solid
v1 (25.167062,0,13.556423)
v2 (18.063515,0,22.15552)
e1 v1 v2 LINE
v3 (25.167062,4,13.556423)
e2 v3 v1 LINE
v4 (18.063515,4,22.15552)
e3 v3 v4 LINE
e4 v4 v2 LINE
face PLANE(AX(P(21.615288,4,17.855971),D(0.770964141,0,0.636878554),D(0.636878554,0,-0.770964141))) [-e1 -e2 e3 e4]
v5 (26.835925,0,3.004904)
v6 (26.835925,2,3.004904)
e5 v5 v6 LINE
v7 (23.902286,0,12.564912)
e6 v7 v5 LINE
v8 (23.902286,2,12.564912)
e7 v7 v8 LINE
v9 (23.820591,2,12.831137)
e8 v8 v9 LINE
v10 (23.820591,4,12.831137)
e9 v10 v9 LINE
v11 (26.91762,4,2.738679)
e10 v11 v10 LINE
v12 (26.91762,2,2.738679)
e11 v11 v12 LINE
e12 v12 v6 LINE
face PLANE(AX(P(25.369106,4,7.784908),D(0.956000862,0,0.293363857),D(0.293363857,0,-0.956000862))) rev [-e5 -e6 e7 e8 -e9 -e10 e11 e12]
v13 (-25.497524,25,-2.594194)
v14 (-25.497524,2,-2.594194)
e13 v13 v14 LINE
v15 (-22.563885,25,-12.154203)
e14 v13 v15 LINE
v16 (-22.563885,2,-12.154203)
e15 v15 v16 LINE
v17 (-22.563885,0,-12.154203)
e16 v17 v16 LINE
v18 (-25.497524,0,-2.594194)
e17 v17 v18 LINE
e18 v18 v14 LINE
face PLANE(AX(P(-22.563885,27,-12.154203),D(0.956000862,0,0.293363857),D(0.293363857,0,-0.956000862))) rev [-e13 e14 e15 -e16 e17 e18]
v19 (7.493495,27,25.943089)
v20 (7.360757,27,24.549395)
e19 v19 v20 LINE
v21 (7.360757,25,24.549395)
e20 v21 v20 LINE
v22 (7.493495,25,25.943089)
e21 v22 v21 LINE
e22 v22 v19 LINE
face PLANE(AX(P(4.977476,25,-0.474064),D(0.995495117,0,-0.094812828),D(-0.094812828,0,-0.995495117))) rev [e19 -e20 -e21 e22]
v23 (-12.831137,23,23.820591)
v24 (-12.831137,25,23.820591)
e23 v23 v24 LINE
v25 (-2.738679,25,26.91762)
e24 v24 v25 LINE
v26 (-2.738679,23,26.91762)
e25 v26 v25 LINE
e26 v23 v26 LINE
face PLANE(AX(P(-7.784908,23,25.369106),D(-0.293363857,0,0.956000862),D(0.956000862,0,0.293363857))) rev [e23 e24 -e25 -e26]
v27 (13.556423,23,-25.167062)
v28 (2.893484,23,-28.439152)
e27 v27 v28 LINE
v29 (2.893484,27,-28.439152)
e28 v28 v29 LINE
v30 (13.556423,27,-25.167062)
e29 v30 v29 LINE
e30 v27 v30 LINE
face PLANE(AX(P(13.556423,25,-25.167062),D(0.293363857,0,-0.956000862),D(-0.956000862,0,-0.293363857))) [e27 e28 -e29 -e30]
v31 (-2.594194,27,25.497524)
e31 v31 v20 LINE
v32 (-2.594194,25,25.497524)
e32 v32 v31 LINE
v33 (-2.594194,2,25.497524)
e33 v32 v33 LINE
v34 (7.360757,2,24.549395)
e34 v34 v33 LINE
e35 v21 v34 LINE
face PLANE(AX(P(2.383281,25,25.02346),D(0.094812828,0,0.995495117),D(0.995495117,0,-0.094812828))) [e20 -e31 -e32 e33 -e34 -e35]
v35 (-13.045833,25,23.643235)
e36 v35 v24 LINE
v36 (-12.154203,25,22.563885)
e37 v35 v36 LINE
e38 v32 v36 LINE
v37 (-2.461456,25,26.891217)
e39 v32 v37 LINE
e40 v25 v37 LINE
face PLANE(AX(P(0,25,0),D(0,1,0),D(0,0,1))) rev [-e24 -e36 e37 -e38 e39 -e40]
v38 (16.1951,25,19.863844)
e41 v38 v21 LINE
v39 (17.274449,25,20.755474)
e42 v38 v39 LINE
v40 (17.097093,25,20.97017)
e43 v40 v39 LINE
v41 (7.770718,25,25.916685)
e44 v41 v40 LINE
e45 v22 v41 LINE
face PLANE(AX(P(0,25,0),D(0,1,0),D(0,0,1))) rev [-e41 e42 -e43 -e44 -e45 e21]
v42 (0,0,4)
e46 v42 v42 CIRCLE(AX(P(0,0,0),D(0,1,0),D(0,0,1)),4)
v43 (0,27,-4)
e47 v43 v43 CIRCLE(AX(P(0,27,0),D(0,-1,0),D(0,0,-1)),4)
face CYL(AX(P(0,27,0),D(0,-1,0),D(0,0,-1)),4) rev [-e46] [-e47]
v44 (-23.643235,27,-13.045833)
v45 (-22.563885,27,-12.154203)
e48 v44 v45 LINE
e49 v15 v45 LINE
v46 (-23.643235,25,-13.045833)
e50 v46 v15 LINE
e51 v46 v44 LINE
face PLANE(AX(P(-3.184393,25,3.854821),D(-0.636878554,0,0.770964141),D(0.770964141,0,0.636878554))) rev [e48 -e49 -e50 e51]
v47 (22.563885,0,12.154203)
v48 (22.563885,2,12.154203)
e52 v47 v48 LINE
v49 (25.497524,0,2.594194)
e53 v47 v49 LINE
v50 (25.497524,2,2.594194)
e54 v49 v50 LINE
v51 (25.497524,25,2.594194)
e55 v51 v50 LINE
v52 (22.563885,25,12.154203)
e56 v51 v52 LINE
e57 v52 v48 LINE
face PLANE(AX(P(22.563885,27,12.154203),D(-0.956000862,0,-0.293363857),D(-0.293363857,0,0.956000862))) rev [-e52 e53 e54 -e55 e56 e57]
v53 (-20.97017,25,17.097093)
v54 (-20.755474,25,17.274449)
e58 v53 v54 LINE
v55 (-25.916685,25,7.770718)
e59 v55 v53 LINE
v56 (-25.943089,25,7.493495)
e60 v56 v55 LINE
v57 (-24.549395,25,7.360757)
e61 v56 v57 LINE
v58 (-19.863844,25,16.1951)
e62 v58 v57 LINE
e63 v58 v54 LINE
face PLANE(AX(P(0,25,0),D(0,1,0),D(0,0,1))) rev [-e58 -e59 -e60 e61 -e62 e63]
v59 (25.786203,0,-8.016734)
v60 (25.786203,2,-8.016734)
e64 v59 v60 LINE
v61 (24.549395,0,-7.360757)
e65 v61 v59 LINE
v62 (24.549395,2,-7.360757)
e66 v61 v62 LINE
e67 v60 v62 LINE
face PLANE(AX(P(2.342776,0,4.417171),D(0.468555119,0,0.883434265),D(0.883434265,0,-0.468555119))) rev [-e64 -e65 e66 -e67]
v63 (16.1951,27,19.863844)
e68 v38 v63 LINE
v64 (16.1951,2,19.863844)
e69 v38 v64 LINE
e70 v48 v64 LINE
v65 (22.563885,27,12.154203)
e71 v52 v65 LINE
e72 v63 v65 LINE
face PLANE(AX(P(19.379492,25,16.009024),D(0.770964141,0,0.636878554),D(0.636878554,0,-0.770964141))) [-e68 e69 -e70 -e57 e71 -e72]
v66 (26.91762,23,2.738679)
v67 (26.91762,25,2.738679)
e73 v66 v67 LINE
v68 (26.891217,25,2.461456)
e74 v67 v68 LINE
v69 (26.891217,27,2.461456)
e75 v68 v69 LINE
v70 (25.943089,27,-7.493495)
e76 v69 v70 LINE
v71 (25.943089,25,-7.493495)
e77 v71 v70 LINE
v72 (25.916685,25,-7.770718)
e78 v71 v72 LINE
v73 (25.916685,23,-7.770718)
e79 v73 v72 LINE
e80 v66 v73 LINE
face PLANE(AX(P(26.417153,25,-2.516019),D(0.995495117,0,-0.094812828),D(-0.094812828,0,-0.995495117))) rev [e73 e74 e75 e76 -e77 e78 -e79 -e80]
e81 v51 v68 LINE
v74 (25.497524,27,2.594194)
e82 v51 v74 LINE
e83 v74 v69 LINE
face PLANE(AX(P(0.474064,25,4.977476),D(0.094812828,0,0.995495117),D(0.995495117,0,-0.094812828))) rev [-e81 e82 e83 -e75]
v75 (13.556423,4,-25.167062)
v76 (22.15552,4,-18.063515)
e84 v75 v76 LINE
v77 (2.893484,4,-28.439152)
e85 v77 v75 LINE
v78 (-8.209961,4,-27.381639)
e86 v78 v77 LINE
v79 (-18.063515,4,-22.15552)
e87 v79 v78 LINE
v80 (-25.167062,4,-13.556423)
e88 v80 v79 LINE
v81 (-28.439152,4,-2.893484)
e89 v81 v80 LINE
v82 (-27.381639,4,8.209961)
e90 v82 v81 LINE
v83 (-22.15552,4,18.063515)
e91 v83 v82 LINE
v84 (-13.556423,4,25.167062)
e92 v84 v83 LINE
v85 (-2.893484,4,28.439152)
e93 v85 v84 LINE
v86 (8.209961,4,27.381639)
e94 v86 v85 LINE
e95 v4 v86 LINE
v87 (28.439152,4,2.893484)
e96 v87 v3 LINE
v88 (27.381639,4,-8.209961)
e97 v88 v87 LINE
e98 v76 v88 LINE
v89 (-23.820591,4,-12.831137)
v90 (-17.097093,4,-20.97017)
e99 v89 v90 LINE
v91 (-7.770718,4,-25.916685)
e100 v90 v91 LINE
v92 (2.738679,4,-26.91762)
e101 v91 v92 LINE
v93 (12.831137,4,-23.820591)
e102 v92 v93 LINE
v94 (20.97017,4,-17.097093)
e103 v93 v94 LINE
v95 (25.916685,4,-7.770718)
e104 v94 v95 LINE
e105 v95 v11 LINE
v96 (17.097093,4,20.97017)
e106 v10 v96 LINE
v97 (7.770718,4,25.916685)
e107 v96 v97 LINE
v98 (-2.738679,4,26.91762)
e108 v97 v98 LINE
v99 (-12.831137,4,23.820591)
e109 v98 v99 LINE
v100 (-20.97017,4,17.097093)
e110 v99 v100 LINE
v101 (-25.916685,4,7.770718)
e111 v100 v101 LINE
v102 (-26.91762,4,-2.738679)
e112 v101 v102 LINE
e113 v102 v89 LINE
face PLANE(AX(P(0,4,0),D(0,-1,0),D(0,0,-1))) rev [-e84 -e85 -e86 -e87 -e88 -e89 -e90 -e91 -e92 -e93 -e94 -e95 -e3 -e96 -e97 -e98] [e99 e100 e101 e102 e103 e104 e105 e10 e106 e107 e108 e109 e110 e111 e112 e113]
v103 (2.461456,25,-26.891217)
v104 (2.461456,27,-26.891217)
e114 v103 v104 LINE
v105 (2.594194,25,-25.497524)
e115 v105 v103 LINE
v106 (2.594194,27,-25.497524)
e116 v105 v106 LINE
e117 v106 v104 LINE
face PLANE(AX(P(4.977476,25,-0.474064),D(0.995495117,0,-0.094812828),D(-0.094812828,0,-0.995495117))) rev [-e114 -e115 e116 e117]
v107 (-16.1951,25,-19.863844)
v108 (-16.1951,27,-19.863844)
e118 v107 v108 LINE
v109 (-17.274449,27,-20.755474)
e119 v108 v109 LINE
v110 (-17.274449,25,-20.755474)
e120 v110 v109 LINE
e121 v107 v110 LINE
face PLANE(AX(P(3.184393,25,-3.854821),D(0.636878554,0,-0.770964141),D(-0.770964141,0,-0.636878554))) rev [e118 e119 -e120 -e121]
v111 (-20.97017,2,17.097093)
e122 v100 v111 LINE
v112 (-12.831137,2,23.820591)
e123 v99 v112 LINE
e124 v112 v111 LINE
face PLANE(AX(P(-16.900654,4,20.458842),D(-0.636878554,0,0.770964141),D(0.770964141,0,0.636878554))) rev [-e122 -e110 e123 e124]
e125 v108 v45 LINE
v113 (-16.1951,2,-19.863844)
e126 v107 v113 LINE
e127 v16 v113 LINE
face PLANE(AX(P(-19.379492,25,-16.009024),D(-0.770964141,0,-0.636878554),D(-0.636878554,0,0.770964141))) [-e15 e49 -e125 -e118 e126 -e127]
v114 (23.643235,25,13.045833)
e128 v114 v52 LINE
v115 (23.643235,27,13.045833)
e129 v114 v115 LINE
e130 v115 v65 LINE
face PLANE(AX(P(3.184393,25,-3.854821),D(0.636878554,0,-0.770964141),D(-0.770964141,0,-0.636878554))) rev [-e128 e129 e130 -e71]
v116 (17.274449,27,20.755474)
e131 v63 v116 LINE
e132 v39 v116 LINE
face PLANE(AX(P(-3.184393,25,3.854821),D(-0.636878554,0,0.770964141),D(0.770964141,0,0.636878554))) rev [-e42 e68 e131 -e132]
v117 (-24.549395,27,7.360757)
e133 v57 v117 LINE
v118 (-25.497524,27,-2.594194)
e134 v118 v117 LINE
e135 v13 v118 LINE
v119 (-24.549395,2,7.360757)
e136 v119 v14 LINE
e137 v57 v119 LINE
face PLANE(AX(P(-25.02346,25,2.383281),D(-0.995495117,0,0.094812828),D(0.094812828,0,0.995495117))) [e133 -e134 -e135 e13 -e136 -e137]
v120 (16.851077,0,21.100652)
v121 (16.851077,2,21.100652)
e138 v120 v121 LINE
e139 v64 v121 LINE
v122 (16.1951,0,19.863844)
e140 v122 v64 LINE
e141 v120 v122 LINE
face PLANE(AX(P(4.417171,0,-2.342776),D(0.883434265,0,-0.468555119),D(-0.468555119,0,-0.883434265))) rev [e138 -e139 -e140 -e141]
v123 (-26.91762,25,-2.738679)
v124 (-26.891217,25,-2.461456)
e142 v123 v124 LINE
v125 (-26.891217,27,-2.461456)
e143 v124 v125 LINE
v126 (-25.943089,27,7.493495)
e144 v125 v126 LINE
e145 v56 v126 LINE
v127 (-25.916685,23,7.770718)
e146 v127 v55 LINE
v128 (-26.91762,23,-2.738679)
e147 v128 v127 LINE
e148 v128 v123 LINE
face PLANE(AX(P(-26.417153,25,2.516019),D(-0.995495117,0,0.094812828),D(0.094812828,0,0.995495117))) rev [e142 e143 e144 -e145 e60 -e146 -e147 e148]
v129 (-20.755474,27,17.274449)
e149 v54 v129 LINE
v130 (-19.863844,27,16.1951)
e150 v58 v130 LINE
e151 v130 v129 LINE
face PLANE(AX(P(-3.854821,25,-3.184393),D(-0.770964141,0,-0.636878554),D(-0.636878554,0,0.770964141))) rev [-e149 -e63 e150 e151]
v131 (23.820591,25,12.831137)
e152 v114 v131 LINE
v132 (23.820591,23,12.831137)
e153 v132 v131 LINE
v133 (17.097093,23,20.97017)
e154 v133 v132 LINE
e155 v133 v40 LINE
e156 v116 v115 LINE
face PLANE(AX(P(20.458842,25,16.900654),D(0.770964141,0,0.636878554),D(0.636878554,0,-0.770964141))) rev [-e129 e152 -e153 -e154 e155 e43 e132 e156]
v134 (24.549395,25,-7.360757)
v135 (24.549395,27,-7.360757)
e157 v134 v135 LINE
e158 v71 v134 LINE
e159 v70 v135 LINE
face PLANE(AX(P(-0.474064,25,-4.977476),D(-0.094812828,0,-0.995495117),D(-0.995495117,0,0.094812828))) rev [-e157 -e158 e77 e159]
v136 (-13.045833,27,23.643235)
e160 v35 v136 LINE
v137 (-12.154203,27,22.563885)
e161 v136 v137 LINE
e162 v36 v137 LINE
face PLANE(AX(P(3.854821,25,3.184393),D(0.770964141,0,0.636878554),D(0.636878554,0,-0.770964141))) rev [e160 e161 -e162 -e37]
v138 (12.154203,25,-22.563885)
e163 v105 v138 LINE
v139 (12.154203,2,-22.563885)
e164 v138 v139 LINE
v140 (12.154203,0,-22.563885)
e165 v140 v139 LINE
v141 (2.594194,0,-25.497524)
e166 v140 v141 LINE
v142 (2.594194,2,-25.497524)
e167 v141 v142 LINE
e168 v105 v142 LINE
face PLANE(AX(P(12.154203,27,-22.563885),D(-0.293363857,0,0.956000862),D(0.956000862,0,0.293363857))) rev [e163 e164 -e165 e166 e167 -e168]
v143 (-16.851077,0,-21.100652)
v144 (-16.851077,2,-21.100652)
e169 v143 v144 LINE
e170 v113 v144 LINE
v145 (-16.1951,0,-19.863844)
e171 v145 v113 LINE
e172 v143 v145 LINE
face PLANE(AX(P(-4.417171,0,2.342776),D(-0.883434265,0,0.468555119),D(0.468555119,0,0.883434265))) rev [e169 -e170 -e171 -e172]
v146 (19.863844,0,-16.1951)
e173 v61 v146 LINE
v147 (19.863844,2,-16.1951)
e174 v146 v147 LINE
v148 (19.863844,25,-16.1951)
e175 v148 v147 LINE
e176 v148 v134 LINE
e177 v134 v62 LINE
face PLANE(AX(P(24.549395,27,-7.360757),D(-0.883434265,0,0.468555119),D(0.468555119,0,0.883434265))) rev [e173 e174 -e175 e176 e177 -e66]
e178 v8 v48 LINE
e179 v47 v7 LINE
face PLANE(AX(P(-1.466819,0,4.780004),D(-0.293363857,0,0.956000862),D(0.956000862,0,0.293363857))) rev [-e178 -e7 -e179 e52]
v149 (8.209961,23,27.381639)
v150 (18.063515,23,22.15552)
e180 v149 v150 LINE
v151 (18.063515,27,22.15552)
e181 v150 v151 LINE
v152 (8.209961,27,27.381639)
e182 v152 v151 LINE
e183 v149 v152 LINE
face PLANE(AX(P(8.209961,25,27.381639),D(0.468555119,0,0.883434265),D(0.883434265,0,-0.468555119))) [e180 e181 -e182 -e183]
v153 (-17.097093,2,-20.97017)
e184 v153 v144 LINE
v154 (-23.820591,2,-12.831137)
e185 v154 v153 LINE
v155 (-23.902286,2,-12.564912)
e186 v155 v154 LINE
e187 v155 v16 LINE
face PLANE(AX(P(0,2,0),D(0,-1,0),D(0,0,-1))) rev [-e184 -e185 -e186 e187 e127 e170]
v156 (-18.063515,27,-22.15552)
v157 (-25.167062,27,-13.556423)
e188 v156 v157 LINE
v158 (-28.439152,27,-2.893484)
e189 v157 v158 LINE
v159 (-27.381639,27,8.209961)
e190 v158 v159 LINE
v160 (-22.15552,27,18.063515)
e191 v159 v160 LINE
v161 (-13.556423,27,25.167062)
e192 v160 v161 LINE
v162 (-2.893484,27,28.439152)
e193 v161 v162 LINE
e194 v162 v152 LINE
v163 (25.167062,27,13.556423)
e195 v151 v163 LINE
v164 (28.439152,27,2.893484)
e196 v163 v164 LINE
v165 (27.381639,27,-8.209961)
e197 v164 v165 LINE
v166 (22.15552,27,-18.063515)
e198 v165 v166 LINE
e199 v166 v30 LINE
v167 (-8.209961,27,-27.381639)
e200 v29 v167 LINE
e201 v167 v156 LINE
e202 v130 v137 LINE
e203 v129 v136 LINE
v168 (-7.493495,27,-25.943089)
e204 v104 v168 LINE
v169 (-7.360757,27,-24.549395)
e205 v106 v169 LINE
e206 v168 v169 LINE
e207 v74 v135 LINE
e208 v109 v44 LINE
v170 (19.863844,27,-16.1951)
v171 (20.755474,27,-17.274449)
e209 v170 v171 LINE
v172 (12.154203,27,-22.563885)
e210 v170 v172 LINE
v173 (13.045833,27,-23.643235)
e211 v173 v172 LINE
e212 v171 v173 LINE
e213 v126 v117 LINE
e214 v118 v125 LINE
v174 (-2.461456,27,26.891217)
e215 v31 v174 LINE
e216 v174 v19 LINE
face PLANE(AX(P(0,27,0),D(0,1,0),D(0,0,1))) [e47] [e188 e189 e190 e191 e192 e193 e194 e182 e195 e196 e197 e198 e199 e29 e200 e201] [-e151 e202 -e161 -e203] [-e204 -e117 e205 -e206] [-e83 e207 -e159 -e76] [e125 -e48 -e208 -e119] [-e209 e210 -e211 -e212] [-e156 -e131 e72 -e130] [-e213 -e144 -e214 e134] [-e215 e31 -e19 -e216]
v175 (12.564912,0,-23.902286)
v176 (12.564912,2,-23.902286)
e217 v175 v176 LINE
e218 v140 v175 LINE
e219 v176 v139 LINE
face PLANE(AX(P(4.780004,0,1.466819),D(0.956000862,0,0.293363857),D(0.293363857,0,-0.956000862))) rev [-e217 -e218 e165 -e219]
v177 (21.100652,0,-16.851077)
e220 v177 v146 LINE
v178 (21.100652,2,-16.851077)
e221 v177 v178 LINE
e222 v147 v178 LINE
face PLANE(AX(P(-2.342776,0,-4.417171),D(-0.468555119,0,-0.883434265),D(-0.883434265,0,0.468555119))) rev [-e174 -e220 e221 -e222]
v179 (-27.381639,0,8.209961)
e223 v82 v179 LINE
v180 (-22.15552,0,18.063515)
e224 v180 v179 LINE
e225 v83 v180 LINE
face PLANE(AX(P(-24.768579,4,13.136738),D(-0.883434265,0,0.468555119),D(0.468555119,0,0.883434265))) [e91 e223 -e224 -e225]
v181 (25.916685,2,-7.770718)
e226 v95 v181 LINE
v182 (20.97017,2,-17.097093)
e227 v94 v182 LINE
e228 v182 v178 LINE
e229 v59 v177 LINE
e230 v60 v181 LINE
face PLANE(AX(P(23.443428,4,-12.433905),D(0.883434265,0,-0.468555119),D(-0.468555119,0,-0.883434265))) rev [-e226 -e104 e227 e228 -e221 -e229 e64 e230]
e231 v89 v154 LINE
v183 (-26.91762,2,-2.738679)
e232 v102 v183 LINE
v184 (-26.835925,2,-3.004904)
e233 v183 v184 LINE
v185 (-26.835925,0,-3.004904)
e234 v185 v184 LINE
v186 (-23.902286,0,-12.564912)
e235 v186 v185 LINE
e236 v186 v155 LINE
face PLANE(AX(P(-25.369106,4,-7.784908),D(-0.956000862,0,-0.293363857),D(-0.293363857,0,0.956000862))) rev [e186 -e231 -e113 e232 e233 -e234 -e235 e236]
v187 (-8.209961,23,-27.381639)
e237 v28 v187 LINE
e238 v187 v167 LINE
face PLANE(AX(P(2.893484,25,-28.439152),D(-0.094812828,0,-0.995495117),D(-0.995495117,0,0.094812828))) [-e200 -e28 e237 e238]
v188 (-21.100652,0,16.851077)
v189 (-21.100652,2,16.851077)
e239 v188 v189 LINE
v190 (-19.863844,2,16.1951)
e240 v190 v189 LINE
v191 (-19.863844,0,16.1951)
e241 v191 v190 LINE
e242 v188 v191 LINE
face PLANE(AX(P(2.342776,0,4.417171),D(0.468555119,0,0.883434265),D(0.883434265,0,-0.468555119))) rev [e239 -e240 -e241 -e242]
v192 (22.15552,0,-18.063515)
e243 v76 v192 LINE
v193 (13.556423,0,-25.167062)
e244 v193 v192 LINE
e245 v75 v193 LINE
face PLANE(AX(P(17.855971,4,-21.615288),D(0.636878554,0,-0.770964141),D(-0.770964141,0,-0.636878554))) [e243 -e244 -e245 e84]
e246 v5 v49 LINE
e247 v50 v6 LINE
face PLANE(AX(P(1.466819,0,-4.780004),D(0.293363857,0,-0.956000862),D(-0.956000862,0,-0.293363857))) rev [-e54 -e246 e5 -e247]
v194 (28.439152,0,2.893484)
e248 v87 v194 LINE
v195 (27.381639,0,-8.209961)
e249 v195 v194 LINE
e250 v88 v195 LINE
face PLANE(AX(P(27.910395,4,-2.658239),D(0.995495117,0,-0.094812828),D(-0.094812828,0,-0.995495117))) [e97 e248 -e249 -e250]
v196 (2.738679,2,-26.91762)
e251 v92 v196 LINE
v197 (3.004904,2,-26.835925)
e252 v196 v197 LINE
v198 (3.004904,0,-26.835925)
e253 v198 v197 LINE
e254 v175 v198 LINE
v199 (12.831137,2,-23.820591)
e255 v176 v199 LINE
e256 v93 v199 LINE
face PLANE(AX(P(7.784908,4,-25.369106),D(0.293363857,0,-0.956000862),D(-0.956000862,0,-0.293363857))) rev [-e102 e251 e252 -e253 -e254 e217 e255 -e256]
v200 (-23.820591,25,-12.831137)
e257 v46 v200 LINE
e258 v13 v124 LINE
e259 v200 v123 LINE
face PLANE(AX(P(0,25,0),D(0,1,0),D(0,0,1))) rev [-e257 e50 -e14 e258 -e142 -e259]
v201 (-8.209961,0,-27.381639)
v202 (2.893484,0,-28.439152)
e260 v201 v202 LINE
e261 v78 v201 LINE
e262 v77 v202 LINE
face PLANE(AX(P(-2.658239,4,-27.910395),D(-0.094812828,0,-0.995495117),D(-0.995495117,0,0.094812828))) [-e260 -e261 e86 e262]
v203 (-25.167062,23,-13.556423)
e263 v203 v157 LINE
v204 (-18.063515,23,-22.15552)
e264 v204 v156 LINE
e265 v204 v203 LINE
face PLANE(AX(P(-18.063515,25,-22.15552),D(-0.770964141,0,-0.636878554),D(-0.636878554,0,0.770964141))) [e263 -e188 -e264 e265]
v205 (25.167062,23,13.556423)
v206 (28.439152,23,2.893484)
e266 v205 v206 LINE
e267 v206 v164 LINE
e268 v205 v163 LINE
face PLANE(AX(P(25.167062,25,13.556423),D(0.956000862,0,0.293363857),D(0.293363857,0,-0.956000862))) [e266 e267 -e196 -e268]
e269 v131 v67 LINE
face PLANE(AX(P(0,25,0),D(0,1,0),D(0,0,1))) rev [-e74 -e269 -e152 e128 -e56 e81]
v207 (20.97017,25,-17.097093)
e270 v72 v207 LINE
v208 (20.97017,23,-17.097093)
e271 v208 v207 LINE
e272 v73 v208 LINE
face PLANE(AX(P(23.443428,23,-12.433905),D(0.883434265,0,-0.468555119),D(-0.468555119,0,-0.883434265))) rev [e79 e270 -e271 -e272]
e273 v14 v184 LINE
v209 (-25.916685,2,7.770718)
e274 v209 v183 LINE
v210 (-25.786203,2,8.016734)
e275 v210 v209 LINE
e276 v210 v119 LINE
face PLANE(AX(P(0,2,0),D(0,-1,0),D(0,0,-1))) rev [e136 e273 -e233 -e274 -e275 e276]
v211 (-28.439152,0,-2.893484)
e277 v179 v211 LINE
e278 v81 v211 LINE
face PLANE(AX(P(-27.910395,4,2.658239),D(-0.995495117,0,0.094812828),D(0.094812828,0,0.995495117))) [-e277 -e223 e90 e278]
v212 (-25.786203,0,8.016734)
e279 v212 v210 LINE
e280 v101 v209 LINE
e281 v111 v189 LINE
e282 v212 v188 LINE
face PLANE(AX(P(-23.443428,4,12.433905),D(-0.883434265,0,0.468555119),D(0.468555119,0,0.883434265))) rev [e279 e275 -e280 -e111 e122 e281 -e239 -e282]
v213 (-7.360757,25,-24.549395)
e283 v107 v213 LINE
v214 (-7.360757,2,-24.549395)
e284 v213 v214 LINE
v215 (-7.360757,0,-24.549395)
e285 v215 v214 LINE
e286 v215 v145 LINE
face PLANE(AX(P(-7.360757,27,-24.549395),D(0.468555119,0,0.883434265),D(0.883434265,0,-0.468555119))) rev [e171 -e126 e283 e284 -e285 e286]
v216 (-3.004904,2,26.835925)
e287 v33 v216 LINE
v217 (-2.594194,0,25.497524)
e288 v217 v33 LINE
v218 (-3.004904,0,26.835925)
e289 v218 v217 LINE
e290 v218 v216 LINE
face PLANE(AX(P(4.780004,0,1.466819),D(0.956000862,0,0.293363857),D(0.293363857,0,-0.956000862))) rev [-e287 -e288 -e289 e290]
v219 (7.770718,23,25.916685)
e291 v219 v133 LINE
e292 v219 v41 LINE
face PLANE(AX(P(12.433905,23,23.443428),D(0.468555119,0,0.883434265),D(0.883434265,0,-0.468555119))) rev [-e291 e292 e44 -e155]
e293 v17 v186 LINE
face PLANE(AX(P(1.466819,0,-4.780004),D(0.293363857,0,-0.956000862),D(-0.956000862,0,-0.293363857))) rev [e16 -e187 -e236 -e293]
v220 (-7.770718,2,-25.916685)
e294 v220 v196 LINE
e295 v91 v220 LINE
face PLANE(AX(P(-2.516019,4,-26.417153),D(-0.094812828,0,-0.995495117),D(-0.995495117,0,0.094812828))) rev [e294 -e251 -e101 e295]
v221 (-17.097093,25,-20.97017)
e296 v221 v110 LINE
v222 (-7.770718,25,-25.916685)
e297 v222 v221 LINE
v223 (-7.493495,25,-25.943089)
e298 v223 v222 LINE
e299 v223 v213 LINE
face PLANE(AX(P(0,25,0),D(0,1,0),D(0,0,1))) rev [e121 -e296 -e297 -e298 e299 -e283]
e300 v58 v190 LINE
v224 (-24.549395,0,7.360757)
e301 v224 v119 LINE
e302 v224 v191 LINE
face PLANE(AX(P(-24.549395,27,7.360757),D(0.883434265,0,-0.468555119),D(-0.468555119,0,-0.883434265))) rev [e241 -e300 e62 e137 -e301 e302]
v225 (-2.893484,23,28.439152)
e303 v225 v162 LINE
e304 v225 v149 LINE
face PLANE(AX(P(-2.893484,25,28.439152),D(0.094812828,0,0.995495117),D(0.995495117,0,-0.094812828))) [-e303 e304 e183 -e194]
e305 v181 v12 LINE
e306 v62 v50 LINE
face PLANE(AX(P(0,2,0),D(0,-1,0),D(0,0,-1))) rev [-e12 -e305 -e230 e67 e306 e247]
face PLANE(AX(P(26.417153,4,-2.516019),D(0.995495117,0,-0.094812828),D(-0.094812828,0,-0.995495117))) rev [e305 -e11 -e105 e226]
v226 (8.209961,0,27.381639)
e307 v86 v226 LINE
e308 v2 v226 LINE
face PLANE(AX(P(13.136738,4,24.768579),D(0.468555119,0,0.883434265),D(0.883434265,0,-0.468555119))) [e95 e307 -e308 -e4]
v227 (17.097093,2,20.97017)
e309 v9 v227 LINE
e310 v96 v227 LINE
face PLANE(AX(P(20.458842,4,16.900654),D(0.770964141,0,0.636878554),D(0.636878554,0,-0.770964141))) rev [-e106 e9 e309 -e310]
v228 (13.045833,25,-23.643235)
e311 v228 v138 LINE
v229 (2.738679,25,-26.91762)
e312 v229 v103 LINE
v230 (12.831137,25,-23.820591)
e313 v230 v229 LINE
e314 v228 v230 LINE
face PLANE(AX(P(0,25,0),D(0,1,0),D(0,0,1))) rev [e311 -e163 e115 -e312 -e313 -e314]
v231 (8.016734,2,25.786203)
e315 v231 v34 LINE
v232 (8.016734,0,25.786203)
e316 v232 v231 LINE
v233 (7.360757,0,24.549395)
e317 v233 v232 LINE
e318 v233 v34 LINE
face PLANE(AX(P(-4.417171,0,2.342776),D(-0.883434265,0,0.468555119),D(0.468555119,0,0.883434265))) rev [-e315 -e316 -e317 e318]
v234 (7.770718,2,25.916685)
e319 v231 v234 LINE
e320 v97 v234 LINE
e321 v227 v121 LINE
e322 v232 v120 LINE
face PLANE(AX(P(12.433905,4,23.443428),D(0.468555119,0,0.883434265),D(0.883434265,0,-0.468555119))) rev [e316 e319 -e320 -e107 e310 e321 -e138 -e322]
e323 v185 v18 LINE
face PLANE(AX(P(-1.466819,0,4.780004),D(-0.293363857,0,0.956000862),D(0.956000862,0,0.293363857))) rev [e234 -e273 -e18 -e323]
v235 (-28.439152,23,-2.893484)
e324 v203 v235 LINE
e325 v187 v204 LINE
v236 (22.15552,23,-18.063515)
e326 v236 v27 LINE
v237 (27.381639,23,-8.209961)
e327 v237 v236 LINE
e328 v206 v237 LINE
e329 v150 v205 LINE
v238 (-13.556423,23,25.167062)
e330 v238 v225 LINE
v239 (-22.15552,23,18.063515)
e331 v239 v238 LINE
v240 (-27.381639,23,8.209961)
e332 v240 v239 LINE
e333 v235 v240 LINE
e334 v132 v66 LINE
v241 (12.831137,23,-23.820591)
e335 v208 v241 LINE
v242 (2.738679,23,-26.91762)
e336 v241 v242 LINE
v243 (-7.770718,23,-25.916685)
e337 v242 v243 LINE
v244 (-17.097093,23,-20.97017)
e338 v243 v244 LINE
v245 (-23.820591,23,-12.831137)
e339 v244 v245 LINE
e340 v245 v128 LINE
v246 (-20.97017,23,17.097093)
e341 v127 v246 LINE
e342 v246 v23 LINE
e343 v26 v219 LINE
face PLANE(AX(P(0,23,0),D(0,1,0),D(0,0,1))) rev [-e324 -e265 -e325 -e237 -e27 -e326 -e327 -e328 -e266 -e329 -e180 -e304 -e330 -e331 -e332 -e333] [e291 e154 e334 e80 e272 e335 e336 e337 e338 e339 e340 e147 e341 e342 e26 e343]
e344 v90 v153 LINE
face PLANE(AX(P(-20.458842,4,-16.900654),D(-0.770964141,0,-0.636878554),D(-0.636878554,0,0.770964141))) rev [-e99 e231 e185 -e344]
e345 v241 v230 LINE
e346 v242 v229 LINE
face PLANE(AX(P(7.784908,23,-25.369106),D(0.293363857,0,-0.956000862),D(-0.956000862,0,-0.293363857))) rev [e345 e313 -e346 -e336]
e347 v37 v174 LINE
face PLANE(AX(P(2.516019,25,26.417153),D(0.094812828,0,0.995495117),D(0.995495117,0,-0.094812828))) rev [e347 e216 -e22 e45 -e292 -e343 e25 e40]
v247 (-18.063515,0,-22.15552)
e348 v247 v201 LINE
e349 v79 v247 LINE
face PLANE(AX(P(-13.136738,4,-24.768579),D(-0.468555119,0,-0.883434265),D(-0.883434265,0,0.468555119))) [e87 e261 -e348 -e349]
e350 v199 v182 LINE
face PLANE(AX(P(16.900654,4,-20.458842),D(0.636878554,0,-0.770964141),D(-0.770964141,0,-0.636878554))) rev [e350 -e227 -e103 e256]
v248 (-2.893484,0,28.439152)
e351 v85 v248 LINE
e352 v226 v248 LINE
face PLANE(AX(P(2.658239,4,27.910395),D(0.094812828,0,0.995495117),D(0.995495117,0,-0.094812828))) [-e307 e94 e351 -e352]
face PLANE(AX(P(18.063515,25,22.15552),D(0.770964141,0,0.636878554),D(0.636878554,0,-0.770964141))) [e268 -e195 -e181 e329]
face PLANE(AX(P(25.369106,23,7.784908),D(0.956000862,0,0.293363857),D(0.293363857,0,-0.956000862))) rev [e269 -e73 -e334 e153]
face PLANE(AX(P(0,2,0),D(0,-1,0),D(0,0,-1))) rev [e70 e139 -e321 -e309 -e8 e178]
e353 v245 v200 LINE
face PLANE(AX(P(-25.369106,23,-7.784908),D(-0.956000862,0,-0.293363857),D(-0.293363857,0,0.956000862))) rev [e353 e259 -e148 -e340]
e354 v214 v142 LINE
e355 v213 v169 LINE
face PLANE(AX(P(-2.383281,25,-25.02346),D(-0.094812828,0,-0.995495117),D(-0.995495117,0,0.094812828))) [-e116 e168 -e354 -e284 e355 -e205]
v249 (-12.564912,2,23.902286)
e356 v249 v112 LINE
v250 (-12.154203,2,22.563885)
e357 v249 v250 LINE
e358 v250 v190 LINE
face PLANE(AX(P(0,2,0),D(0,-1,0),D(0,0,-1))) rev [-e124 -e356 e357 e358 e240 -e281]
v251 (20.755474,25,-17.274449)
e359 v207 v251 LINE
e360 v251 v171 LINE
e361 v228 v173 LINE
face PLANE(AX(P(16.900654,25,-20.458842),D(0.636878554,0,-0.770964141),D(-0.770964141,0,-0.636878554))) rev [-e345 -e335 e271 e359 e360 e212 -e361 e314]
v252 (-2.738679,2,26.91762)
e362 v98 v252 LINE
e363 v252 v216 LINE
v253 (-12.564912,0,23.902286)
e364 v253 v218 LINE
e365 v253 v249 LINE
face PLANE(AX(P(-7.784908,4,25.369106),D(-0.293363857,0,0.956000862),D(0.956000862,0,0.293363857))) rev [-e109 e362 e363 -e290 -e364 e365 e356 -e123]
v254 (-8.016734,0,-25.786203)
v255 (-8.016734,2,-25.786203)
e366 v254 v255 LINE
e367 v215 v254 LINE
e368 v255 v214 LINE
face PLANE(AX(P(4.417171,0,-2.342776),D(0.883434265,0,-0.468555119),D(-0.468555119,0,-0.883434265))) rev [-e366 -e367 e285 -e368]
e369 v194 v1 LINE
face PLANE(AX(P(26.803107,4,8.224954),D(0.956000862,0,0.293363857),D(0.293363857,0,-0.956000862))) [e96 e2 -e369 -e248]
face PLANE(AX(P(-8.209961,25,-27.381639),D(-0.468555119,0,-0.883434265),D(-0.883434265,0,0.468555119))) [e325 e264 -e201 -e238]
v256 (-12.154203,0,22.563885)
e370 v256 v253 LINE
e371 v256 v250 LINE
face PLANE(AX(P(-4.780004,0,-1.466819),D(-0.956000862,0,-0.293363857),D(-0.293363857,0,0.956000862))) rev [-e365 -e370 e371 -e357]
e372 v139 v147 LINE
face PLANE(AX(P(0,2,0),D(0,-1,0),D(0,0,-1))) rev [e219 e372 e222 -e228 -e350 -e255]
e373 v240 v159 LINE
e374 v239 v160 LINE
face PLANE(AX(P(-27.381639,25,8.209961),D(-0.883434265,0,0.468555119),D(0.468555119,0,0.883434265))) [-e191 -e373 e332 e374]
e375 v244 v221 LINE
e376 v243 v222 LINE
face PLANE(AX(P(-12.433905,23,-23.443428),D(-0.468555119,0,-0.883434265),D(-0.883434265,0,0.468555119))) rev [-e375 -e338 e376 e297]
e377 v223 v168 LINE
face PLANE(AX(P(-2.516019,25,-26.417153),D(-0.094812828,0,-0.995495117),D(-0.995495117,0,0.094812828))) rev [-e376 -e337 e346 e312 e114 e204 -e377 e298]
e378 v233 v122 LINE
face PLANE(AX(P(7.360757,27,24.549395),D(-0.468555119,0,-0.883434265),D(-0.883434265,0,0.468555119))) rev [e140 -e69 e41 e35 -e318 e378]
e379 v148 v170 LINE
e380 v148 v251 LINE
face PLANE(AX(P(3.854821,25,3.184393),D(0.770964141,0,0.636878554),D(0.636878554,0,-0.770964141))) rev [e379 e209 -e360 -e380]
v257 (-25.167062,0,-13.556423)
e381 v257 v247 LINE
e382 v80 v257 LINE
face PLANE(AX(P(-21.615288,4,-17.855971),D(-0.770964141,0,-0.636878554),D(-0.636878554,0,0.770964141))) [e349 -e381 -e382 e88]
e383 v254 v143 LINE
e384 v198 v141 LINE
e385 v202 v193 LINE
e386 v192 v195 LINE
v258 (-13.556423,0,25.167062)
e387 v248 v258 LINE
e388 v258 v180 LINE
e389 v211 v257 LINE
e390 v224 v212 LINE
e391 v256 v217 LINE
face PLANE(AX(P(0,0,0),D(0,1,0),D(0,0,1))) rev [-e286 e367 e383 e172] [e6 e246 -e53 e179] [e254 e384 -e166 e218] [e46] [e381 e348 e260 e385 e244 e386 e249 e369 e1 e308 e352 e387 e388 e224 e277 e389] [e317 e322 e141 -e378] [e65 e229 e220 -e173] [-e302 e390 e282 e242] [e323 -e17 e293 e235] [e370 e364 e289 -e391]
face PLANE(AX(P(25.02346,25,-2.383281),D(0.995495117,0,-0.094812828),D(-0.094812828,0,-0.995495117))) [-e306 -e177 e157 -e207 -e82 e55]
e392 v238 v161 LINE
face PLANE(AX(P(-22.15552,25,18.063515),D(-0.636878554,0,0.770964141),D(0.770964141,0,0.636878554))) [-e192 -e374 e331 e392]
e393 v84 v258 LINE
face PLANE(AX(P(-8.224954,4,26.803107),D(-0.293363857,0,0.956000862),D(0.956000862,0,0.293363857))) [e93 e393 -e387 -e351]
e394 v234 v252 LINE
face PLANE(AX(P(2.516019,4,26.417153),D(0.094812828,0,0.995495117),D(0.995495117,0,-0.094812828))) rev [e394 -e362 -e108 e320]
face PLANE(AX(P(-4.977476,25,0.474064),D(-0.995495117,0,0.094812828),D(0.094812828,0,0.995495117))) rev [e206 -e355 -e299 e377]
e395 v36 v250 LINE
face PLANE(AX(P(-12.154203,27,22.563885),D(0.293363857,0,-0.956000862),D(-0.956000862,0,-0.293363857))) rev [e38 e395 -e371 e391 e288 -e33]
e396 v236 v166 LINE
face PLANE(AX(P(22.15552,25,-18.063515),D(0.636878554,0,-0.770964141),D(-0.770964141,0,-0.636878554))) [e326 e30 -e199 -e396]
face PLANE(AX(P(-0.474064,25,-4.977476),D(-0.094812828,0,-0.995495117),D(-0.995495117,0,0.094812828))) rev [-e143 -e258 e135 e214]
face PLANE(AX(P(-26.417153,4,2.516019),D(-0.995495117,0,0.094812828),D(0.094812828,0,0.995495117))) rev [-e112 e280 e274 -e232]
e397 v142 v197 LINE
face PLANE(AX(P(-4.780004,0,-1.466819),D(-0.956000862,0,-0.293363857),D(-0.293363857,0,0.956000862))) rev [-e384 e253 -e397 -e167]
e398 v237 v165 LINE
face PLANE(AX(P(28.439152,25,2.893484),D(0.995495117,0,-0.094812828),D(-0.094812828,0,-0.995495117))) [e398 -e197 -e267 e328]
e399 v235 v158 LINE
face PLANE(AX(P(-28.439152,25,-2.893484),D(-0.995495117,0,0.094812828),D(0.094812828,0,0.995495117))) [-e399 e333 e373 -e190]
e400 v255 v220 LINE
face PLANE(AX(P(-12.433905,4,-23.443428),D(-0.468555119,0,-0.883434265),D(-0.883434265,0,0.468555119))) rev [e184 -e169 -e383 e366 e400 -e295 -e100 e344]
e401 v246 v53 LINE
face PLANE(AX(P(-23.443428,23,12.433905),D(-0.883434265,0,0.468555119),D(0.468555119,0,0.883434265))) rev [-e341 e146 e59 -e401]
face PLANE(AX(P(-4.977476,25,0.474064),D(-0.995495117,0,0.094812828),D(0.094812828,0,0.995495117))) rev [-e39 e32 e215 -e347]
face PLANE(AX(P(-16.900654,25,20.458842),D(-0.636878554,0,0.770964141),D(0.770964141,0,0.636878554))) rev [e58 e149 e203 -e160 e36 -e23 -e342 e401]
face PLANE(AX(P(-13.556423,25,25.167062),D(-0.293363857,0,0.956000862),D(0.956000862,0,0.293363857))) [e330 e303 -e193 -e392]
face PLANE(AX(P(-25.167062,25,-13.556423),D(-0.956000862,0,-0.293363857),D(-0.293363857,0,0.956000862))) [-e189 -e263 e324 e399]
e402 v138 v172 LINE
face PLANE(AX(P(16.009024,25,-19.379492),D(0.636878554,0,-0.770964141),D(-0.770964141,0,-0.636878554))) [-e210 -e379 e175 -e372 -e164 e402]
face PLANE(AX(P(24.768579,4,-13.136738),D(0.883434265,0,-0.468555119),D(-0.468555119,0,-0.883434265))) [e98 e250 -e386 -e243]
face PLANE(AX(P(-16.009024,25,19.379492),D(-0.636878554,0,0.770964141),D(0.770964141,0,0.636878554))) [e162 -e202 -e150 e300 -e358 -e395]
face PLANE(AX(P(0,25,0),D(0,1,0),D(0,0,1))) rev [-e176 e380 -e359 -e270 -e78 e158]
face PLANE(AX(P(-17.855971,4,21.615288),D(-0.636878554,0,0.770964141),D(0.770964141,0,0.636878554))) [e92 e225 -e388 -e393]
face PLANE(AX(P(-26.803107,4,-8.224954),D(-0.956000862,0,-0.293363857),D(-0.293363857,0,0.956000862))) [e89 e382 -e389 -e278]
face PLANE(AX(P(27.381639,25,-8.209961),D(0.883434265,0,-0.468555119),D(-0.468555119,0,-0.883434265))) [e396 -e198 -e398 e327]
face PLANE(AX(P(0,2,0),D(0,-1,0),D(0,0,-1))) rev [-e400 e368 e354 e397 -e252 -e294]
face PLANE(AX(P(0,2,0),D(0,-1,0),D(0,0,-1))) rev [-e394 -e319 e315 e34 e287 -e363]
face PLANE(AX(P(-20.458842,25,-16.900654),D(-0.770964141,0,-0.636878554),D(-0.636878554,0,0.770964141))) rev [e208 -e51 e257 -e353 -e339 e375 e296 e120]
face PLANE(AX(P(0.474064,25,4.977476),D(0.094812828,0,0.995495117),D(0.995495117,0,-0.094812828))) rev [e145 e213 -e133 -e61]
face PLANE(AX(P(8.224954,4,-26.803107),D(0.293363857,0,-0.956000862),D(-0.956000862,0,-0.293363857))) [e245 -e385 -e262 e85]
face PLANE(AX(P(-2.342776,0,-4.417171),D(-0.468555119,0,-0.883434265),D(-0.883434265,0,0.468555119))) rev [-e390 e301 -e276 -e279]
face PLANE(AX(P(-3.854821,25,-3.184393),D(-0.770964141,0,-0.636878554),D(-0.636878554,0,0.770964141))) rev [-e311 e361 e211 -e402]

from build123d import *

# Parameters (mm, degrees)
BOSS_EXTRUDE1_DEPTH     = 27
BOSS_EXTRUDE2_DEPTH     = 2
BOSS_EXTRUDE3_DEPTH     = 4
BOSS_EXTRUDE4_DEPTH     = 2
CUT_EXTRUDE1_DEPTH      = 49.441415403
CUT_EXTRUDE1_DEPTH_BACK = 49.441415403
BOSS_EXTRUDE8_DEPTH     = 2
BOSS_EXTRUDE9_DEPTH     = 4
CUT_EXTRUDE2_DEPTH      = 49.441415403
CUT_EXTRUDE2_DEPTH_BACK = 49.441415403
SKETCH5_R               = 4


with BuildPart() as part:
    # Sketch2 → Boss-Extrude1 (new body)
    with BuildSketch(Plane(origin=(0, 0, 0), x_dir=(1, 0, 0), z_dir=(0, 1, 0))):
        Polygon((22.563885141, -12.154202836), (25.497523714, -2.594194221), (24.549395438, 7.360756948), (19.863844247, 16.195099597), (12.154202836, 22.563885141), (2.594194221, 25.497523714), (-7.360756948, 24.549395438), (-16.195099597, 19.863844247), (-22.563885141, 12.154202836), (-25.497523714, 2.594194221), (-24.549395438, -7.360756948), (-19.863844247, -16.195099597), (-12.154202836, -22.563885141), (-2.594194221, -25.497523714), (7.360756948, -24.549395438), (16.195099597, -19.863844247), align=None)
    extrude(amount=BOSS_EXTRUDE1_DEPTH)



with BuildPart() as body_2:
    # Sketch3 → Boss-Extrude2 (new body)
    with BuildSketch(Plane(origin=(0, 27, 0), x_dir=(1, 0, 0), z_dir=(0, 1, 0))):
        Polygon((2.893484263, 28.439151941), (-8.20996139, 27.38163889), (-18.063514845, 22.155519532), (-25.167061911, 13.556423167), (-28.439151941, 2.893484263), (-27.38163889, -8.20996139), (-22.155519532, -18.063514845), (-13.556423167, -25.167061911), (-2.893484263, -28.439151941), (8.20996139, -27.38163889), (18.063514845, -22.155519532), (25.167061911, -13.556423167), (28.439151941, -2.893484263), (27.38163889, 8.20996139), (22.155519532, 18.063514845), (13.556423167, 25.167061911), align=None)
        Polygon((-7.360756948, 24.549395438), (-7.493494906, 25.943088602), (2.461456262, 26.891216878), (2.594194221, 25.497523714), align=None, mode=Mode.SUBTRACT)
        Polygon((-23.643234938, 13.045832812), (-17.274449394, 20.755474224), (-16.195099597, 19.863844247), (-22.563885141, 12.154202836), align=None, mode=Mode.SUBTRACT)
        Polygon((-25.943088602, -7.493494906), (-26.891216878, 2.461456262), (-25.497523714, 2.594194221), (-24.549395438, -7.360756948), align=None, mode=Mode.SUBTRACT)
        Polygon((-13.045832812, -23.643234938), (-20.755474224, -17.274449394), (-19.863844247, -16.195099597), (-12.154202836, -22.563885141), align=None, mode=Mode.SUBTRACT)
        Polygon((7.493494906, -25.943088602), (-2.461456262, -26.891216878), (-2.594194221, -25.497523714), (7.360756948, -24.549395438), align=None, mode=Mode.SUBTRACT)
        Polygon((23.643234938, -13.045832812), (17.274449394, -20.755474224), (16.195099597, -19.863844247), (22.563885141, -12.154202836), align=None, mode=Mode.SUBTRACT)
        Polygon((25.943088602, 7.493494906), (26.891216878, -2.461456262), (25.497523714, -2.594194221), (24.549395438, 7.360756948), align=None, mode=Mode.SUBTRACT)
        Polygon((13.045832812, 23.643234938), (20.755474224, 17.274449394), (19.863844247, 16.195099597), (12.154202836, 22.563885141), align=None, mode=Mode.SUBTRACT)
    extrude(amount=-BOSS_EXTRUDE2_DEPTH)


with BuildPart() as body_3:
    # Sketch4 → Boss-Extrude3 (new body)
    with BuildSketch(Plane(origin=(0, 0, 0), x_dir=(-1, 0, 0), z_dir=(0, -1, 0))):
        Polygon((8.20996139, 27.38163889), (-2.893484263, 28.439151941), (-13.556423167, 25.167061911), (-22.155519532, 18.063514845), (-27.38163889, 8.20996139), (-28.439151941, -2.893484263), (-25.167061911, -13.556423167), (-18.063514845, -22.155519532), (-8.20996139, -27.38163889), (2.893484263, -28.439151941), (13.556423167, -25.167061911), (22.155519532, -18.063514845), (27.38163889, -8.20996139), (28.439151941, 2.893484263), (25.167061911, 13.556423167), (18.063514845, 22.155519532), align=None)
        Polygon((-20.970170247, 17.097093165), (-12.831136789, 23.820591168), (-2.738679069, 26.9176201), (7.770717713, 25.91668538), (17.097093165, 20.970170247), (23.820591168, 12.831136789), (26.9176201, 2.738679069), (25.91668538, -7.770717713), (20.970170247, -17.097093165), (12.831136789, -23.820591168), (2.738679069, -26.9176201), (-7.770717713, -25.91668538), (-17.097093165, -20.970170247), (-23.820591168, -12.831136789), (-26.9176201, -2.738679069), (-25.91668538, 7.770717713), align=None, mode=Mode.SUBTRACT)
    extrude(amount=-BOSS_EXTRUDE3_DEPTH)


with BuildPart() as part_1:
    add(part.part)

    add(body_3.part)  # Boss-Extrude4 merges body 3
    # Sketch4<4> → Boss-Extrude4 (add)
    with BuildSketch(Plane(origin=(0, 0, 0), x_dir=(-1, 0, 0), z_dir=(0, -1, 0))):
        Polygon((-2.738679069, 26.9176201), (-12.831136789, 23.820591168), (-20.970170247, 17.097093165), (-25.91668538, 7.770717713), (-26.9176201, -2.738679069), (-23.820591168, -12.831136789), (-17.097093165, -20.970170247), (-7.770717713, -25.91668538), (2.738679069, -26.9176201), (12.831136789, -23.820591168), (20.970170247, -17.097093165), (25.91668538, -7.770717713), (26.9176201, 2.738679069), (23.820591168, 12.831136789), (17.097093165, 20.970170247), (7.770717713, 25.91668538), align=None)
        Polygon((-12.154202836, 22.563885141), (-2.594194221, 25.497523714), (7.360756948, 24.549395438), (16.195099597, 19.863844247), (22.563885141, 12.154202836), (25.497523714, 2.594194221), (24.549395438, -7.360756948), (19.863844247, -16.195099597), (12.154202836, -22.563885141), (2.594194221, -25.497523714), (-7.360756948, -24.549395438), (-16.195099597, -19.863844247), (-22.563885141, -12.154202836), (-25.497523714, -2.594194221), (-24.549395438, 7.360756948), (-19.863844247, 16.195099597), align=None, mode=Mode.SUBTRACT)
    extrude(amount=-BOSS_EXTRUDE4_DEPTH)


with BuildPart() as cut_extrude1_tool:
    # Sketch3<3> → Cut-Extrude1 (new, two sides: drawn at the far end of the back side and taken through both)
    with BuildSketch(Plane(origin=(0, 27, 0), x_dir=(1, 0, 0), z_dir=(0, 1, 0)).offset(-CUT_EXTRUDE1_DEPTH_BACK)):
        Polygon((-16.195099597, 19.863844247), (-7.360756948, 24.549395438), (-8.016734114, 25.786203409), (-16.851076763, 21.100652218), align=None)
        Polygon((3.004903621, 26.835924921), (2.594194221, 25.497523714), (12.154202836, 22.563885141), (12.564912236, 23.902286347), align=None)
        Polygon((-25.497523714, 2.594194221), (-22.563885141, 12.154202836), (-23.902286347, 12.564912236), (-26.835924921, 3.004903621), align=None)
        Polygon((21.100652218, 16.851076763), (19.863844247, 16.195099597), (24.549395438, 7.360756948), (25.786203409, 8.016734114), align=None)
        Polygon((-19.863844247, -16.195099597), (-24.549395438, -7.360756948), (-25.786203409, -8.016734114), (-21.100652218, -16.851076763), align=None)
        Polygon((26.835924921, -3.004903621), (25.497523714, -2.594194221), (22.563885141, -12.154202836), (23.902286347, -12.564912236), align=None)
        Polygon((-2.594194221, -25.497523714), (-12.154202836, -22.563885141), (-12.564912236, -23.902286347), (-3.004903621, -26.835924921), align=None)
        Polygon((16.851076763, -21.100652218), (16.195099597, -19.863844247), (7.360756948, -24.549395438), (8.016734114, -25.786203409), align=None)
    extrude(amount=CUT_EXTRUDE1_DEPTH + CUT_EXTRUDE1_DEPTH_BACK)


with BuildPart() as part_2:
    add(part_1.part)

    # Cut-Extrude1: cut by cut_extrude1_tool
    add(cut_extrude1_tool.part, mode=Mode.SUBTRACT)



with BuildPart() as body_2_1:
    add(body_2.part)

    # Cut-Extrude1: cut by cut_extrude1_tool
    add(cut_extrude1_tool.part, mode=Mode.SUBTRACT)


with BuildPart() as part_3:
    add(part_2.part)

    add(body_2_1.part)  # Boss-Extrude8 merges body 2
    # Sketch3<5> → Boss-Extrude8 (add)
    with BuildSketch(Plane(origin=(0, 27, 0), x_dir=(1, 0, 0), z_dir=(0, 1, 0))):
        Polygon((-16.195099597, 19.863844247), (-7.360756948, 24.549395438), (-8.016734114, 25.786203409), (-16.851076763, 21.100652218), align=None)
        Polygon((3.004903621, 26.835924921), (2.594194221, 25.497523714), (12.154202836, 22.563885141), (12.564912236, 23.902286347), align=None)
        Polygon((-25.497523714, 2.594194221), (-22.563885141, 12.154202836), (-23.902286347, 12.564912236), (-26.835924921, 3.004903621), align=None)
        Polygon((21.100652218, 16.851076763), (19.863844247, 16.195099597), (24.549395438, 7.360756948), (25.786203409, 8.016734114), align=None)
        Polygon((-19.863844247, -16.195099597), (-24.549395438, -7.360756948), (-25.786203409, -8.016734114), (-21.100652218, -16.851076763), align=None)
        Polygon((26.835924921, -3.004903621), (25.497523714, -2.594194221), (22.563885141, -12.154202836), (23.902286347, -12.564912236), align=None)
        Polygon((-2.594194221, -25.497523714), (-12.154202836, -22.563885141), (-12.564912236, -23.902286347), (-3.004903621, -26.835924921), align=None)
        Polygon((16.851076763, -21.100652218), (16.195099597, -19.863844247), (7.360756948, -24.549395438), (8.016734114, -25.786203409), align=None)
    extrude(amount=-BOSS_EXTRUDE8_DEPTH)

    # Sketch3<6> → Boss-Extrude9 (add)
    with BuildSketch(Plane(origin=(0, 27, 0), x_dir=(1, 0, 0), z_dir=(0, 1, 0))):
        Polygon((2.893484263, 28.439151941), (-8.20996139, 27.38163889), (-18.063514845, 22.155519532), (-25.167061911, 13.556423167), (-28.439151941, 2.893484263), (-27.38163889, -8.20996139), (-22.155519532, -18.063514845), (-13.556423167, -25.167061911), (-2.893484263, -28.439151941), (8.20996139, -27.38163889), (18.063514845, -22.155519532), (25.167061911, -13.556423167), (28.439151941, -2.893484263), (27.38163889, 8.20996139), (22.155519532, 18.063514845), (13.556423167, 25.167061911), align=None)
        Polygon((-7.770717713, 25.91668538), (-7.493494906, 25.943088602), (-4.248833717, 26.252116237), (2.461456262, 26.891216878), (2.738679069, 26.9176201), (3.004903621, 26.835924921), (12.564912236, 23.902286347), (12.831136789, 23.820591168), (13.045832812, 23.643234938), (20.755474224, 17.274449394), (20.970170247, 17.097093165), (21.100652218, 16.851076763), (25.786203409, 8.016734114), (25.91668538, 7.770717713), (25.943088602, 7.493494906), (26.891216878, -2.461456262), (26.9176201, -2.738679069), (26.835924921, -3.004903621), (23.902286347, -12.564912236), (23.820591168, -12.831136789), (23.643234938, -13.045832812), (17.274449394, -20.755474224), (17.097093165, -20.970170247), (16.851076763, -21.100652218), (8.016734114, -25.786203409), (7.770717713, -25.91668538), (7.493494906, -25.943088602), (-2.461456262, -26.891216878), (-2.738679069, -26.9176201), (-3.004903621, -26.835924921), (-12.564912236, -23.902286347), (-12.831136789, -23.820591168), (-13.045832812, -23.643234938), (-20.755474224, -17.274449394), (-20.970170247, -17.097093165), (-21.100652218, -16.851076763), (-25.786203409, -8.016734114), (-25.91668538, -7.770717713), (-25.943088602, -7.493494906), (-26.891216878, 2.461456262), (-26.9176201, 2.738679069), (-26.835924921, 3.004903621), (-23.902286347, 12.564912236), (-23.820591168, 12.831136789), (-23.643234938, 13.045832812), (-17.274449394, 20.755474224), (-17.097093165, 20.970170247), (-16.851076763, 21.100652218), (-8.016734114, 25.786203409), align=None, mode=Mode.SUBTRACT)
    extrude(amount=-BOSS_EXTRUDE9_DEPTH)

    # Sketch5 → Cut-Extrude2 (cut, two sides: drawn at the far end of the back side and taken through both)
    with BuildSketch(Plane.XZ.offset(-CUT_EXTRUDE2_DEPTH_BACK)):
        Circle(SKETCH5_R)
    extrude(amount=CUT_EXTRUDE2_DEPTH + CUT_EXTRUDE2_DEPTH_BACK, mode=Mode.SUBTRACT)


solid = part_3.part
